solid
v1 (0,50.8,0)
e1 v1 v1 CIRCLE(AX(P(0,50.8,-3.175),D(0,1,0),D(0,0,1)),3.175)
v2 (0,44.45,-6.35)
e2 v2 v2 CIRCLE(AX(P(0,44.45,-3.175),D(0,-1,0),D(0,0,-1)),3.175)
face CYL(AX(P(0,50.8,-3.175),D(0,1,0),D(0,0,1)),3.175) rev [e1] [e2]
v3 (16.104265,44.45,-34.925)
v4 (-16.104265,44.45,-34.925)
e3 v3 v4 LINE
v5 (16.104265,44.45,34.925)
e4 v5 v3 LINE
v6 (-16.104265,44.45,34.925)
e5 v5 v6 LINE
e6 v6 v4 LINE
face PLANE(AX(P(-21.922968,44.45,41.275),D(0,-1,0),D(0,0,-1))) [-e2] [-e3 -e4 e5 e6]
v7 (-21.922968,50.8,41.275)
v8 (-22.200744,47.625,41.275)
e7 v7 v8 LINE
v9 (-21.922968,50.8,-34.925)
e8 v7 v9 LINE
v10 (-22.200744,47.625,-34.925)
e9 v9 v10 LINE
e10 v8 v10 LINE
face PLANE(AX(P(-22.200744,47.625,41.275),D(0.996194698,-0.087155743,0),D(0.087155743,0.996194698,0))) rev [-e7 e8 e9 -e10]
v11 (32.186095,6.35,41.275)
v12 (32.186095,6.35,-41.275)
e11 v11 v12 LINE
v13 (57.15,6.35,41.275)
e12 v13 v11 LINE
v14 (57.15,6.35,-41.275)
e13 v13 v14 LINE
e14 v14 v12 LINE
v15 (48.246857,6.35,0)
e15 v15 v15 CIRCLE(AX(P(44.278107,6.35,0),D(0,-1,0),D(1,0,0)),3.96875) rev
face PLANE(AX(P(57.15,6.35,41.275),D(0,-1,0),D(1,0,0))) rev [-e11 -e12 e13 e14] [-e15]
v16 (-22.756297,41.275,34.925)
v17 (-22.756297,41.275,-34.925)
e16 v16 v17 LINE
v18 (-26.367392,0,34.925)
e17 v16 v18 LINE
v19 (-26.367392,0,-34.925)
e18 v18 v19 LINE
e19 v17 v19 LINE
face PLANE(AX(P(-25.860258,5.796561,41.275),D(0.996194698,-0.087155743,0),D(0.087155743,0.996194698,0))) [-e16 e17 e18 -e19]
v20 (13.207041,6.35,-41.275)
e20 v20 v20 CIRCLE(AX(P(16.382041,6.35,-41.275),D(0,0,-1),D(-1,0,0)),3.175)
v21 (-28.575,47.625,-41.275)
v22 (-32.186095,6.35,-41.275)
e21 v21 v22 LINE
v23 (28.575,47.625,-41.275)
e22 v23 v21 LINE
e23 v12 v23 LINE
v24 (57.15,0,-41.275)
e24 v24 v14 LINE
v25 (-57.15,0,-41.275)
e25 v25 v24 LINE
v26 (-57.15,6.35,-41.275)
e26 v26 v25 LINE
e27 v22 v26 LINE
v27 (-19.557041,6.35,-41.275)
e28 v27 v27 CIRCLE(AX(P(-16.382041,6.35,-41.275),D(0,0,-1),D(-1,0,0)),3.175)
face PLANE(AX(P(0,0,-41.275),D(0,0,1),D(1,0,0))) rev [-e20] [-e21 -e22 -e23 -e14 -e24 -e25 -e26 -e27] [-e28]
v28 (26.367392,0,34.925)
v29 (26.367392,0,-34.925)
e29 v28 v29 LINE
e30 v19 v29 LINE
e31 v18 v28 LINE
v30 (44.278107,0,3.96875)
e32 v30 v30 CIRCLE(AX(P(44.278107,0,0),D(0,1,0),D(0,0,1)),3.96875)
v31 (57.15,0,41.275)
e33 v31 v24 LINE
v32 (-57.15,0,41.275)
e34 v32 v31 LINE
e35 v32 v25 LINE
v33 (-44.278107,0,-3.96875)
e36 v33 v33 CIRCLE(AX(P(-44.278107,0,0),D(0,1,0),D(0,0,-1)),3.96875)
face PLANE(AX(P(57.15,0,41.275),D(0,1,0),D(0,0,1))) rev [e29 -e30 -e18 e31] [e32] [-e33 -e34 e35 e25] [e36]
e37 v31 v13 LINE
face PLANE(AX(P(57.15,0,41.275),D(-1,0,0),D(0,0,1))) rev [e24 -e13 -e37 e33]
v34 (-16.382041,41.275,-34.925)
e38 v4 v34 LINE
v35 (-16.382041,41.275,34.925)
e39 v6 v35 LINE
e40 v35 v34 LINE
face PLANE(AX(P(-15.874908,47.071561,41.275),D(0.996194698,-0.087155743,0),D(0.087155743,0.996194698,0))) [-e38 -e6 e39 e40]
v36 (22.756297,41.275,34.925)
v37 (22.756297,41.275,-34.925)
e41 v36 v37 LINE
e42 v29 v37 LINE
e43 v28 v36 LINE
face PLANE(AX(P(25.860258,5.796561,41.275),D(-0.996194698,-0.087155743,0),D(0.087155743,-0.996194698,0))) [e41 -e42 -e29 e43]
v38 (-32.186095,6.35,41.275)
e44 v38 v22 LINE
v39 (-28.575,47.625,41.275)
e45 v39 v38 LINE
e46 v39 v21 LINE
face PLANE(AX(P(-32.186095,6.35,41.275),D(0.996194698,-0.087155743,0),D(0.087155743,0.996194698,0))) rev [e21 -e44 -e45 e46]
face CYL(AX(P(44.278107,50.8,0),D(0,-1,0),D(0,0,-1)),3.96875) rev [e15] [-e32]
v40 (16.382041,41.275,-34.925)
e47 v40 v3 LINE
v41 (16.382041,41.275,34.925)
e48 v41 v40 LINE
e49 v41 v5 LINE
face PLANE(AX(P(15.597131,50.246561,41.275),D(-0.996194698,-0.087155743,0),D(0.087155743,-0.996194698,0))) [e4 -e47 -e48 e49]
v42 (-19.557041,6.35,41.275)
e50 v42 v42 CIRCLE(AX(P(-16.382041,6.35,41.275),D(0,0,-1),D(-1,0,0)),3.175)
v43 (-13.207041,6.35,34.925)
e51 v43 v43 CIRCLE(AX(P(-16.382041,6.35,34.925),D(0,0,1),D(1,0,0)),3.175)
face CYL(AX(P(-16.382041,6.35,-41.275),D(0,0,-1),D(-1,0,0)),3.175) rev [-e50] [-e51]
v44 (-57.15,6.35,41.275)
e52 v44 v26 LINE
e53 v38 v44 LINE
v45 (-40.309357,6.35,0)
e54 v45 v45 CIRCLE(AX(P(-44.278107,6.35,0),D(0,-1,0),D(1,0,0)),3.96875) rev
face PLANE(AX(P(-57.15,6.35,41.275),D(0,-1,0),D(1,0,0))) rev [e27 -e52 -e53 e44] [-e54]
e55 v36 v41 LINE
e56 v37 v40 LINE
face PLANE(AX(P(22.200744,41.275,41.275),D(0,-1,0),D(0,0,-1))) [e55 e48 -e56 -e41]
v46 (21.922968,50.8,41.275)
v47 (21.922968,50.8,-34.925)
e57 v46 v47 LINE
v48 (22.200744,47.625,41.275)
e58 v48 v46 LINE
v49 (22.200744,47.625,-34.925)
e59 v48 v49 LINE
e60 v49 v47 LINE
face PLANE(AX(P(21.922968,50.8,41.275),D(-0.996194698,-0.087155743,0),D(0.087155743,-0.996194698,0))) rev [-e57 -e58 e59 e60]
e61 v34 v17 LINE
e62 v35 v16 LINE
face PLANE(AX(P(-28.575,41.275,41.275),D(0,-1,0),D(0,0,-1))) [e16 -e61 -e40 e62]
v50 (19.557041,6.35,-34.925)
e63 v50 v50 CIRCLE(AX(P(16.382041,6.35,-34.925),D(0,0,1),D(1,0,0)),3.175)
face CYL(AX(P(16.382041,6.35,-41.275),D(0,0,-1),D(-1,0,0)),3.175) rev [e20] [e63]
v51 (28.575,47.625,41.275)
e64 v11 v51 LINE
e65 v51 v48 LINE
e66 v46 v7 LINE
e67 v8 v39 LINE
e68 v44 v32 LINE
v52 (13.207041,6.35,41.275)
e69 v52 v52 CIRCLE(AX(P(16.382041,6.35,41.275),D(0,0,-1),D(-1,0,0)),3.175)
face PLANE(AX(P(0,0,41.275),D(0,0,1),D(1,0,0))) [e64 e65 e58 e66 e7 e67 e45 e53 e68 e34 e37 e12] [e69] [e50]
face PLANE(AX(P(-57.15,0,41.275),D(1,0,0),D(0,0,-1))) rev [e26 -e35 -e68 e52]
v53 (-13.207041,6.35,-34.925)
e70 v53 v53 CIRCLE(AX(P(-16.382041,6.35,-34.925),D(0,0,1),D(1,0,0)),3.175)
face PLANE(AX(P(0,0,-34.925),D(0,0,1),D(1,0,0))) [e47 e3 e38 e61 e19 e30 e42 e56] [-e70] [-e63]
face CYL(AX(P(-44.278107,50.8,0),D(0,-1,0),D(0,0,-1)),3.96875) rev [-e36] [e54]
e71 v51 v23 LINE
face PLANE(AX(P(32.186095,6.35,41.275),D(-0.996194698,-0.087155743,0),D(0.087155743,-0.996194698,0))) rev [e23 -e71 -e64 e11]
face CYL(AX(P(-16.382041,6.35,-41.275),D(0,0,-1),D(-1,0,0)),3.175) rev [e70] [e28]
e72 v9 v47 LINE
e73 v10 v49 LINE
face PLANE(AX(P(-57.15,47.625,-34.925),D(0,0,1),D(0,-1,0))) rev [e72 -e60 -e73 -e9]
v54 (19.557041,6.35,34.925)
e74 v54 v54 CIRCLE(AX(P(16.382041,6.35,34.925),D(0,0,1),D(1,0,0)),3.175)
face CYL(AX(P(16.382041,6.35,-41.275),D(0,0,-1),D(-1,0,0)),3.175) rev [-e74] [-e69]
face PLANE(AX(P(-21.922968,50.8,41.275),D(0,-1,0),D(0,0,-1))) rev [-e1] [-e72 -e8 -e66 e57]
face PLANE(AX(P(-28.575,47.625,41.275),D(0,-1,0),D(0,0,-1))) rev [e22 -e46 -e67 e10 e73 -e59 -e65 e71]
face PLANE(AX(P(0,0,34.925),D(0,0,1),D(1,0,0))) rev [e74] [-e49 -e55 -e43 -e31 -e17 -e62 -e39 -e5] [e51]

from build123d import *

# Parameters (mm, degrees)
BOSS_EXTRUDE1_DEPTH         = 41.275
SHELL1_START                = -34.925
SHELL1_DEPTH                = 69.85
CUT_EXTRUDE2_DEPTH          = 87.892969365
CUT_EXTRUDE2_DEPTH_BACK     = 87.892969365
SKETCH7_W                   = 6.35
SKETCH7_H                   = 3.175
SKETCH8_R                   = 3.96875
CUT_EXTRUDE3_DEPTH          = 120.685287839
F_1_4_0_25_DIAMETER_HOLE1_D = 6.35
F_1_4_0_25_DIAMETER_HOLE2_D = 6.35


# Read off the part's stored shape, not the designer's step: Shell1
with BuildPart() as part:
    # Sketch1 → Boss-Extrude1 (new, symmetric)
    with BuildSketch(Plane.XY):
        Polygon((57.15, 0), (-57.15, 0), (-57.15, 6.35), (-32.186094587, 6.35), (-28.575, 47.625), (-22.200744032, 47.625), (-21.922967525, 50.8), (21.922967525, 50.8), (22.200744032, 47.625), (28.575, 47.625), (32.186094587, 6.35), (57.15, 6.35), align=None)
    extrude(amount=BOSS_EXTRUDE1_DEPTH, both=True)

    # Shell1 outline → Shell1 (cut)
    with BuildSketch(Plane.XY.offset(SHELL1_START)):
        Polygon((26.367391632, 0), (22.756297045, 41.275), (16.382041077, 41.275), (16.10426457, 44.45), (-16.10426457, 44.45), (-16.382041077, 41.275), (-22.756297045, 41.275), (-26.367391632, 0), align=None)
    extrude(amount=SHELL1_DEPTH, mode=Mode.SUBTRACT)

    # Sketch7 → Cut-Extrude2 (cut, two sides: drawn at the far end of the back side and taken through both)
    with BuildSketch(Plane(origin=(0, 0, 0), x_dir=(0, 0, -1), z_dir=(1, 0, 0)).offset(-CUT_EXTRUDE2_DEPTH_BACK)):
        with Locations((38.1, 49.2125)):
            Rectangle(SKETCH7_W, SKETCH7_H)
    extrude(amount=CUT_EXTRUDE2_DEPTH + CUT_EXTRUDE2_DEPTH_BACK, mode=Mode.SUBTRACT)

    # Sketch8 → Cut-Extrude3 (cut, through all)
    with BuildSketch(Plane(origin=(0, 0, -50.8), x_dir=(1, 0, 0), z_dir=(0, 1, 0))):
        with Locations((44.278106598, -50.8)):
            Circle(SKETCH8_R)
        with Locations(Location((-44.278106598, -50.8, 0), (0, 0, 90))):
            Circle(SKETCH8_R)
    extrude(amount=CUT_EXTRUDE3_DEPTH, mode=Mode.SUBTRACT)

    # 1/4 (0.25) Diameter Hole1 (through all)
    with Locations(Plane(origin=(0, 50.8, 0), x_dir=(1, 0, 0), z_dir=(0, 1, 0))):
        with Locations((0, 3.175)):
            Hole(F_1_4_0_25_DIAMETER_HOLE1_D / 2)

    # 1/4 (0.25) Diameter Hole2 (through all)
    with Locations(Plane(origin=(0, 0, -41.275), x_dir=(-1, 0, 0), z_dir=(0, 0, -1))):
        with Locations((-16.382041077, 6.35), (16.382041077, 6.35)):
            Hole(F_1_4_0_25_DIAMETER_HOLE2_D / 2)


solid = part.part
